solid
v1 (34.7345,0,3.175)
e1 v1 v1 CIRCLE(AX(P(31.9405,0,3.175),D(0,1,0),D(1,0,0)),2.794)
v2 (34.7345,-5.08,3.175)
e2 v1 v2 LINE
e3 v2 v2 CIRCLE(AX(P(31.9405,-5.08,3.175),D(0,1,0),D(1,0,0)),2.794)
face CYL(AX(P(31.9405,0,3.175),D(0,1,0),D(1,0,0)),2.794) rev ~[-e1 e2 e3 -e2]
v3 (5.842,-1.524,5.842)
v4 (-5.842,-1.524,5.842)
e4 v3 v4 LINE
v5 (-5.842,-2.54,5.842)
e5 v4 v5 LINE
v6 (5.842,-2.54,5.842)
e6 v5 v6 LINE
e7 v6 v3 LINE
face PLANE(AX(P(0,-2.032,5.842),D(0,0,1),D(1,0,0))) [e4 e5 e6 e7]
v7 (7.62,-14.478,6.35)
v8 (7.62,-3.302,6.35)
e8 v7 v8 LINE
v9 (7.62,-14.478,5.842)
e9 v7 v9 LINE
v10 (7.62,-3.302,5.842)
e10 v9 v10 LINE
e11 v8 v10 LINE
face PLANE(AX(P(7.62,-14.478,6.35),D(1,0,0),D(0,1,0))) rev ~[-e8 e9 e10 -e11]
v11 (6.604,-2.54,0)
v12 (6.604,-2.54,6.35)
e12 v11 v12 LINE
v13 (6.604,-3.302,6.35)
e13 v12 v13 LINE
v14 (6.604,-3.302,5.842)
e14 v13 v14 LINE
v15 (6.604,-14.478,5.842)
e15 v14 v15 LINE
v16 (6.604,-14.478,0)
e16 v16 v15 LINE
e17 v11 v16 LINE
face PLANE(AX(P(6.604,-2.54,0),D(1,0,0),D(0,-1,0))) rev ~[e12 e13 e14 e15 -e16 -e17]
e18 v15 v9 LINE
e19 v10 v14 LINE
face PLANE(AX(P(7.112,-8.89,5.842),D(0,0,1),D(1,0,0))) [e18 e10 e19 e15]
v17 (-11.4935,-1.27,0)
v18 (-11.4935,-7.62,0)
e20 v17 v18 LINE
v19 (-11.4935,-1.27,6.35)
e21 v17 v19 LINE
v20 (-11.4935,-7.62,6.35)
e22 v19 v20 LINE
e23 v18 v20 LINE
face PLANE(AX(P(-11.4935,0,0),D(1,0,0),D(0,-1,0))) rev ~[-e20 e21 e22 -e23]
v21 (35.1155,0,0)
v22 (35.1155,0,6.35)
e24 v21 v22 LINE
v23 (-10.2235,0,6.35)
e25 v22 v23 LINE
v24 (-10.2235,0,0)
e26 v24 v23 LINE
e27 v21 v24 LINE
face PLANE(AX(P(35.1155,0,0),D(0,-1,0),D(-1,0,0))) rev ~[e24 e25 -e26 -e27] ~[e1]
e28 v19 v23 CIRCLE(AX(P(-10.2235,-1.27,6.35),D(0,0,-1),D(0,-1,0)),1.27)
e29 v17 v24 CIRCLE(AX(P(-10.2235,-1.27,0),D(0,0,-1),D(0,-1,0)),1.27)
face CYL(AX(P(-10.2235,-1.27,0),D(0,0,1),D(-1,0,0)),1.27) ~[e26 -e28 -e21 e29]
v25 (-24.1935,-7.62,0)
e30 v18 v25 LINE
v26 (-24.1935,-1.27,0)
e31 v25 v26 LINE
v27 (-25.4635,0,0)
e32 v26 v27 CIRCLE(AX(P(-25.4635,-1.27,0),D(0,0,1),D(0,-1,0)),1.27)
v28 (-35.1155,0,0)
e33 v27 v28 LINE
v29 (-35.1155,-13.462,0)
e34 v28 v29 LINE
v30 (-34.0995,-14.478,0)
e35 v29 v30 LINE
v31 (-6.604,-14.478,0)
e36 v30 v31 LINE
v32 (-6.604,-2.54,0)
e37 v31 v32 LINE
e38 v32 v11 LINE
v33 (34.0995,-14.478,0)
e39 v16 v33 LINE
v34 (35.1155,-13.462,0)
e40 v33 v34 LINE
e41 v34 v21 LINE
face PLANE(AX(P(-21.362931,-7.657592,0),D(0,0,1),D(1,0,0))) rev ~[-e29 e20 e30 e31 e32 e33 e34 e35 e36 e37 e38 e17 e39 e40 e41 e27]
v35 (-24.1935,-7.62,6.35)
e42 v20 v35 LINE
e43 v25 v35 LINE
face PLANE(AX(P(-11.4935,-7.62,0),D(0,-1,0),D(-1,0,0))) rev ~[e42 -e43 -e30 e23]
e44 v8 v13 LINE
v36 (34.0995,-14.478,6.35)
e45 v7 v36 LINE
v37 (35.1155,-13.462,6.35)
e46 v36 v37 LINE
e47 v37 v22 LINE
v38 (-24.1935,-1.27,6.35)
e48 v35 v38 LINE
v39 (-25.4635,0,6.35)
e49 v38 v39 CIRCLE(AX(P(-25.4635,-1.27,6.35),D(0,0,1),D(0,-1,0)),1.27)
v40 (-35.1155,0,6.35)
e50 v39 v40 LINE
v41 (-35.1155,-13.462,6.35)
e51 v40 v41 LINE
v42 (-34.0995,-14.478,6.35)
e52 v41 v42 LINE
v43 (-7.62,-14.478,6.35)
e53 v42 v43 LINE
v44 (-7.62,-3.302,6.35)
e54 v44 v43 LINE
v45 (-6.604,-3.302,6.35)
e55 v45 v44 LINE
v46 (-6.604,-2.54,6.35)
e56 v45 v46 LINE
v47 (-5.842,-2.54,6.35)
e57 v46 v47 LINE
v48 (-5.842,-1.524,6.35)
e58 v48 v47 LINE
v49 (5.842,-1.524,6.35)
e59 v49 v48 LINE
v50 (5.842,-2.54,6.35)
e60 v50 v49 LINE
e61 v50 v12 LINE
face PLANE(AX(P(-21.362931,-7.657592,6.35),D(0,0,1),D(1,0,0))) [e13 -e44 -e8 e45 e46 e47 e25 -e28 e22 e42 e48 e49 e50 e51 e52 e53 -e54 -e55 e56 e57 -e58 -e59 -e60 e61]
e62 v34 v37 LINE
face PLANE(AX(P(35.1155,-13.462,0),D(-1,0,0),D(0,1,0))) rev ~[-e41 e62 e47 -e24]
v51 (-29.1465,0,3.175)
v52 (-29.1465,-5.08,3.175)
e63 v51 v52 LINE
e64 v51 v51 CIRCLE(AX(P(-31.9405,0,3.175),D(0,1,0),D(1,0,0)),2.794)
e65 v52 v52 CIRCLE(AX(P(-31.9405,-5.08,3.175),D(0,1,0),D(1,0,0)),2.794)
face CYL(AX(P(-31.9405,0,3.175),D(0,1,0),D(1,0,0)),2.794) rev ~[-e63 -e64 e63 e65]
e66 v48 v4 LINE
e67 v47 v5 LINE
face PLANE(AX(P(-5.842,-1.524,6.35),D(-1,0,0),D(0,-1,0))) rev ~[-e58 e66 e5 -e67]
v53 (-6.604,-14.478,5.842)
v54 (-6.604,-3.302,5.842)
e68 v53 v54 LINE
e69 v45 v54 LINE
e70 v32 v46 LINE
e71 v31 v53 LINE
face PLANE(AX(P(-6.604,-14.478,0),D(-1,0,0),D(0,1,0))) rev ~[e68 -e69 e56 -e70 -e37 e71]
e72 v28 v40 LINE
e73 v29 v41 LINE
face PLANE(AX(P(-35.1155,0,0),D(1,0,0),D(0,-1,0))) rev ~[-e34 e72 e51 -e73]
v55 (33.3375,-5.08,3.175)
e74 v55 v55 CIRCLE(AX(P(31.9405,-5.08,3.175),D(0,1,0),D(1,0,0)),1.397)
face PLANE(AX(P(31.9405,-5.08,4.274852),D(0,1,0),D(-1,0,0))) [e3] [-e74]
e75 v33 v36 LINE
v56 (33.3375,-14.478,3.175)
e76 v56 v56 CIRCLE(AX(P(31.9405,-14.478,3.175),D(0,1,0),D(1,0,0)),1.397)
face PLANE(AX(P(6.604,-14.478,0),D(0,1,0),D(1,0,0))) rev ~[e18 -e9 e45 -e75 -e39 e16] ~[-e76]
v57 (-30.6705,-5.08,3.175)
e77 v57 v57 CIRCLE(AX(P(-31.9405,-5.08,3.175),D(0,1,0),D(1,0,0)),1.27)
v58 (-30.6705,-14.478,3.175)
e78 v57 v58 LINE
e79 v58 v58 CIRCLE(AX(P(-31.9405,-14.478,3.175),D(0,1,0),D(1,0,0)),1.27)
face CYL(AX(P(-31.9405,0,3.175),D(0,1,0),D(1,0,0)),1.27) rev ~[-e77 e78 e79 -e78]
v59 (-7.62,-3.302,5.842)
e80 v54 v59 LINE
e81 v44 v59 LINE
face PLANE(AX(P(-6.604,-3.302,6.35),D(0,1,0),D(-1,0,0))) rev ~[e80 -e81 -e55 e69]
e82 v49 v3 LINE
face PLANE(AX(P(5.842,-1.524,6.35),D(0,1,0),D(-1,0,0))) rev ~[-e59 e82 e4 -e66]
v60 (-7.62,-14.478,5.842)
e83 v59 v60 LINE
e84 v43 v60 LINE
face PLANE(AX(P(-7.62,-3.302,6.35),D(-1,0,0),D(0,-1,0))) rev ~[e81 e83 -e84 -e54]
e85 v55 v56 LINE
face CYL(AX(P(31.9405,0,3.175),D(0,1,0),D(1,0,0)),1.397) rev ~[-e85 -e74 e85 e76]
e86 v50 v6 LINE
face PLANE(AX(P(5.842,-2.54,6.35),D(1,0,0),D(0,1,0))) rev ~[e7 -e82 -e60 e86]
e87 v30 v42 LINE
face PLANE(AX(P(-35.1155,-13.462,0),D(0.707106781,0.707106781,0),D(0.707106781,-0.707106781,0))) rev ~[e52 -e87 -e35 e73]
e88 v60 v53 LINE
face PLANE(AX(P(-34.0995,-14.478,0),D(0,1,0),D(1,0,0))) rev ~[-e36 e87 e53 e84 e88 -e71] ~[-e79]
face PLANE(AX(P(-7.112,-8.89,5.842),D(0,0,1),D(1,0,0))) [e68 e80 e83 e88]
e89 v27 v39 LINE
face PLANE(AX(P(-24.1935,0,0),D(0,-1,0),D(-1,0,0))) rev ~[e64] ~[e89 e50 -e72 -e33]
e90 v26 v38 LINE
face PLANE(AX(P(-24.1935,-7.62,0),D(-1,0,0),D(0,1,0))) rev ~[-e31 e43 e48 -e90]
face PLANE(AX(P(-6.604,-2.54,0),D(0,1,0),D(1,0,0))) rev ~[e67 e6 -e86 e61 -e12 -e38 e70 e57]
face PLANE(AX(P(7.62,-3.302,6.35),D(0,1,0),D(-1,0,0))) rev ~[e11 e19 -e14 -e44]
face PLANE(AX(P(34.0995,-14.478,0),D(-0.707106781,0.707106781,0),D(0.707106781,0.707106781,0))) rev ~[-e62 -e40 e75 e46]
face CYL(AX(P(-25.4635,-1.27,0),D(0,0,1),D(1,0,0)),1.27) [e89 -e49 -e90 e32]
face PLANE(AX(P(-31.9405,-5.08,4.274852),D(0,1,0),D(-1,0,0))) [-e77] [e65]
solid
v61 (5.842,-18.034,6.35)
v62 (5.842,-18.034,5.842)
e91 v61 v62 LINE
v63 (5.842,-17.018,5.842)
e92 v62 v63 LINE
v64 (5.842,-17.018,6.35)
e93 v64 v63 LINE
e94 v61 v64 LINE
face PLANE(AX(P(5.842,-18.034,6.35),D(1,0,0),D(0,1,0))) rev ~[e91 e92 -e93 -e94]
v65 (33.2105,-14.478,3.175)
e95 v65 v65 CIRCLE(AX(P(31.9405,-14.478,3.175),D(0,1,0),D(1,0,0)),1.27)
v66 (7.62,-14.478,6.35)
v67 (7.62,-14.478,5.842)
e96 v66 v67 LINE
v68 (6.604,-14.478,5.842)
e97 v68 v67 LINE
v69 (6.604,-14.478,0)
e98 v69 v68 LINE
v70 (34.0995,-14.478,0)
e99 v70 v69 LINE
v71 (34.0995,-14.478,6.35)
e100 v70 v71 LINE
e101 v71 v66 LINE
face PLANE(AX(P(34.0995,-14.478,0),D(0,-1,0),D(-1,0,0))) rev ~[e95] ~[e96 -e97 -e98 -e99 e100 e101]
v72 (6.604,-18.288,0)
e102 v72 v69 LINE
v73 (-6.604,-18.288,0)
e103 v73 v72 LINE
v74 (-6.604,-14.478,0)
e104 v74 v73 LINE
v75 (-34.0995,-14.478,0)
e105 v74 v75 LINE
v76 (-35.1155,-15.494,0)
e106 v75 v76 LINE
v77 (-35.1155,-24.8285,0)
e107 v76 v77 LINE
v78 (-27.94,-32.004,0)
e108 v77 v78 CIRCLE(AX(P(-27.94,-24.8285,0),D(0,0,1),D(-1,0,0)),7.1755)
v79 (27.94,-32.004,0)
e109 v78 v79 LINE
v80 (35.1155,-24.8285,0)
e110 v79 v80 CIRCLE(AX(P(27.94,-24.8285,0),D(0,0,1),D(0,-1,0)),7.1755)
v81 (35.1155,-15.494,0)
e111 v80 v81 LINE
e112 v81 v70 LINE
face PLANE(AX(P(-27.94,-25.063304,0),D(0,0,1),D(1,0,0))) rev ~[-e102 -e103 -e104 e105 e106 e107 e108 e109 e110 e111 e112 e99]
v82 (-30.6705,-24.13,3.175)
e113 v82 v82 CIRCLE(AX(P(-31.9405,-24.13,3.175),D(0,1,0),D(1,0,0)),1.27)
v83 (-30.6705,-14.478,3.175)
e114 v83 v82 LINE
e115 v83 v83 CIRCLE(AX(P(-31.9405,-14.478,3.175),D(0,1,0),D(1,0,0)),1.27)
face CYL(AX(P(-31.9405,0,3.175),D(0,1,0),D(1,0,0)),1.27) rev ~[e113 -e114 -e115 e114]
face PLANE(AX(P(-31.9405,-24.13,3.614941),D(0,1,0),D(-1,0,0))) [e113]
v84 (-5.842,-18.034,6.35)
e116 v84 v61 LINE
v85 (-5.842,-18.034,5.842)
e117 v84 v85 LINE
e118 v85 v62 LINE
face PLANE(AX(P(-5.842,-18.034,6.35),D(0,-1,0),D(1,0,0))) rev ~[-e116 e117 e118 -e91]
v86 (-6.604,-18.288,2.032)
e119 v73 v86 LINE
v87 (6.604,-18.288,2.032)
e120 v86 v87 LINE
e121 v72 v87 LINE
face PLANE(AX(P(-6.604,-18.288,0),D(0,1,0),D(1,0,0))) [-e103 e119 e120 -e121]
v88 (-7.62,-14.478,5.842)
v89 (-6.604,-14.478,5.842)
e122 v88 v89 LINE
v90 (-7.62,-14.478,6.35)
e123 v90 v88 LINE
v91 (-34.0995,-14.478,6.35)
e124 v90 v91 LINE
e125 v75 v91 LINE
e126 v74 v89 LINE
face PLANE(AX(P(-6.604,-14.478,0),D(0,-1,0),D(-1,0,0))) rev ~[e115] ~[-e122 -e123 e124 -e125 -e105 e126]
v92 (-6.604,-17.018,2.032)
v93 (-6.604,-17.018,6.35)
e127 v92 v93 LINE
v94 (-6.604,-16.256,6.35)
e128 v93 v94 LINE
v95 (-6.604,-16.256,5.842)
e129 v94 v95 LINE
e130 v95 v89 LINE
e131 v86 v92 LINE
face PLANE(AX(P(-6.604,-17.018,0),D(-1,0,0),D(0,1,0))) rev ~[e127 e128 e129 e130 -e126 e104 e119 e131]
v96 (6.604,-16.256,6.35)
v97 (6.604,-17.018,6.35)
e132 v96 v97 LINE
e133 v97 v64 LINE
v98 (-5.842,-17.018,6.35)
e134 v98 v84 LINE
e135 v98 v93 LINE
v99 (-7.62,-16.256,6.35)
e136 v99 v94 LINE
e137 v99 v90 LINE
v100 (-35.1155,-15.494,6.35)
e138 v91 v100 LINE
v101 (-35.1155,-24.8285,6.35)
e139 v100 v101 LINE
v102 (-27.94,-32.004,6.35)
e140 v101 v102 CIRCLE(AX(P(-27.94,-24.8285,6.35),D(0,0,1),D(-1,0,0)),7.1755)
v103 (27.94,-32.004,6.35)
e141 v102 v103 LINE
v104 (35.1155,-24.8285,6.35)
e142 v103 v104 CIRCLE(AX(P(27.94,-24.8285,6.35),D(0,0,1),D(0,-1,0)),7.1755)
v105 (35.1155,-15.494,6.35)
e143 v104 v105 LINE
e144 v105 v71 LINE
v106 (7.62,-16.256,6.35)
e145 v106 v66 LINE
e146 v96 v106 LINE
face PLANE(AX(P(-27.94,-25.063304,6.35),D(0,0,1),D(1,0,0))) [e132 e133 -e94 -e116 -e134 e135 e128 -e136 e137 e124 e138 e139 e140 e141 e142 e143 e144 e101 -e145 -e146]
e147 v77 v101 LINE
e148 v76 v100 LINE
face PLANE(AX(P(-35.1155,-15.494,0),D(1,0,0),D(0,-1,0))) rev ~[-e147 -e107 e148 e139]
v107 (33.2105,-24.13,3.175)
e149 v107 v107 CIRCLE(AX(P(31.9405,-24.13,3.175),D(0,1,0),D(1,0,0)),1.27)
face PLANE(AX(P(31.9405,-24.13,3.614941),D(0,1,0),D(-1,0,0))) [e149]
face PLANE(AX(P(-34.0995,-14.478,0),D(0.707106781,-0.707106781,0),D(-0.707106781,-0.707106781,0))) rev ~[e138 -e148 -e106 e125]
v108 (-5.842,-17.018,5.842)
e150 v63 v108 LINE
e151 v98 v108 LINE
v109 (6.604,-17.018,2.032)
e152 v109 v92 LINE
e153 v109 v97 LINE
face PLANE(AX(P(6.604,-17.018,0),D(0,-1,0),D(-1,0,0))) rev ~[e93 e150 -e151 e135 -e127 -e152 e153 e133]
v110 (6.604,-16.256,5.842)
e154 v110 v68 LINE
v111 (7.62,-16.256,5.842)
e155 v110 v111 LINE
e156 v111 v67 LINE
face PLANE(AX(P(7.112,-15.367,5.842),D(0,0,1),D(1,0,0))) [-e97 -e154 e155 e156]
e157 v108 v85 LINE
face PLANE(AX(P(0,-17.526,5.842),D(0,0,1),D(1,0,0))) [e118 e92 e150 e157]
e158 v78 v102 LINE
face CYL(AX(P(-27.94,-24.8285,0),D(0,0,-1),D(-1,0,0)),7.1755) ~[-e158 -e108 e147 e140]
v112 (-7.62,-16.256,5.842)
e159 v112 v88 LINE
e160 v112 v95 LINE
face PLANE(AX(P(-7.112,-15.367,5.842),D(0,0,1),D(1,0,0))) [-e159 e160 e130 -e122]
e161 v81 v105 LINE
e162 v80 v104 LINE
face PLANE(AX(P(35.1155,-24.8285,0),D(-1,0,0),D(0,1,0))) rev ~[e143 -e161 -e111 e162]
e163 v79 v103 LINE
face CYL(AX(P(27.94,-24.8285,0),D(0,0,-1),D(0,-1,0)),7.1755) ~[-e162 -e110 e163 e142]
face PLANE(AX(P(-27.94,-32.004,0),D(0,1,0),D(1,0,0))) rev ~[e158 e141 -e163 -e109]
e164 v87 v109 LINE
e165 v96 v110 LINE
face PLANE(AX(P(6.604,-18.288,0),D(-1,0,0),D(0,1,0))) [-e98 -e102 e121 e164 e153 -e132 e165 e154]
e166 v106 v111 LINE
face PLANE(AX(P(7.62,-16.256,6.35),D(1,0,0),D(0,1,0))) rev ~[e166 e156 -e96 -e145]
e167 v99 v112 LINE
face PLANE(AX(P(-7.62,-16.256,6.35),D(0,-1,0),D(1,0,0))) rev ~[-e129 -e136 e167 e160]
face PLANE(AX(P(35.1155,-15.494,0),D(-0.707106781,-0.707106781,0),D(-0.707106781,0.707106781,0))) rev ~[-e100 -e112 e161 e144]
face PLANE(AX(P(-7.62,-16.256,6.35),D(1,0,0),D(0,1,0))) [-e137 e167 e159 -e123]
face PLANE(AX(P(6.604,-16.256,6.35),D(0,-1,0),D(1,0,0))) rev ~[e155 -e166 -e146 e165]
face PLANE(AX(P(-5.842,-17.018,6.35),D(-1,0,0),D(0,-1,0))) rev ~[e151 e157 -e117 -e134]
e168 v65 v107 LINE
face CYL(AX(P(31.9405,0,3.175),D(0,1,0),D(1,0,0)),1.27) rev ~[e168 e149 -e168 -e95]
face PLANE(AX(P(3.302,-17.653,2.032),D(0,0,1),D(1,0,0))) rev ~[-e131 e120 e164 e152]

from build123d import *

# Parameters (mm, degrees)
F0_W      = 6.604
F0_H      = 2.54
F1_DEPTH  = 6.35
F0_H_2    = 1.27
F0_W_2    = 2.54
F2_DEPTH  = 6.35
F3_DEPTH  = 2.032
F6_DEPTH  = 5.08
F7_DEPTH  = 24.13
F8_DEPTH  = 14.478
F11_W     = 1.016
F11_H     = 1.778
F12_DEPTH = 0.508
F13_DEPTH = 0.508
F14_R     = 1.27


# Not quite as in the source:
# - a feature names something its author has since deleted; it is built from what else it names


with BuildPart() as f1:
    # F0 (on Top) → F1 (new body)
    with BuildSketch(Plane.XY):
        Polygon((-9.144, -14.478), (-9.144, 0), (-11.4935, 0), (-11.4935, -7.62), (-24.1935, -7.62), (-24.1935, 0), (-35.1155, 0), (-35.1155, -13.462), (-34.0995, -14.478), align=None)
        Polygon((35.1155, 0), (9.144, 0), (9.144, -14.478), (34.0995, -14.478), (35.1155, -13.462), align=None)
        Polygon((-6.604, -2.54), (-6.604, 0), (-9.144, 0), (-9.144, -14.478), (-6.604, -14.478), align=None)
        with Locations((-3.302, -1.27)):
            Rectangle(F0_W, F0_H)
        Polygon((9.144, 0), (0, 0), (0, -2.54), (6.604, -2.54), (6.604, -14.478), (9.144, -14.478), align=None)
    extrude(amount=F1_DEPTH)

    # F5 (on face) + F4 (on face) → F6 (cut)
    with BuildSketch(Plane(origin=(0, 0, 0), x_dir=(-1, 0, 0), z_dir=(0, 1, 0))):
        with BuildLine():
            ThreePointArc((-29.1465, 3.175), (-31.9405, 5.969), (-34.7345, 3.175))
            Line((-34.7345, 3.175), (-33.3375, 3.175))
            ThreePointArc((-33.3375, 3.175), (-31.9405, 4.572), (-30.5435, 3.175))
            Line((-30.5435, 3.175), (-29.1465, 3.175))
        make_face()
        with BuildLine():
            Line((-33.3375, 3.175), (-34.7345, 3.175))
            ThreePointArc((-34.7345, 3.175), (-31.9405, 0.381), (-29.1465, 3.175))
            Line((-29.1465, 3.175), (-30.5435, 3.175))
            ThreePointArc((-30.5435, 3.175), (-31.9405, 1.778), (-33.3375, 3.175))
        make_face()
        with BuildLine():
            Line((-33.2105, 3.175), (-33.3375, 3.175))
            ThreePointArc((-33.3375, 3.175), (-31.9405, 1.778), (-30.5435, 3.175))
            Line((-30.5435, 3.175), (-30.6705, 3.175))
            ThreePointArc((-30.6705, 3.175), (-31.9405, 1.905), (-33.2105, 3.175))
        make_face()
        with BuildLine():
            Line((-30.6705, 3.175), (-33.2105, 3.175))
            ThreePointArc((-33.2105, 3.175), (-31.9405, 1.905), (-30.6705, 3.175))
        make_face()
        with BuildLine():
            ThreePointArc((-30.5435, 3.175), (-31.9405, 4.572), (-33.3375, 3.175))
            Line((-33.3375, 3.175), (-33.2105, 3.175))
            ThreePointArc((-33.2105, 3.175), (-31.9405, 4.445), (-30.6705, 3.175))
            Line((-30.6705, 3.175), (-30.5435, 3.175))
        make_face()
        with BuildLine():
            ThreePointArc((-30.6705, 3.175), (-31.9405, 4.445), (-33.2105, 3.175))
            Line((-33.2105, 3.175), (-30.6705, 3.175))
        make_face()
    with BuildSketch(Plane(origin=(0, 0, 0), x_dir=(-1, 0, 0), z_dir=(0, 1, 0))):
        with BuildLine():
            Line((33.3375, 3.175), (34.7345, 3.175))
            ThreePointArc((34.7345, 3.175), (31.9405, 5.969), (29.1465, 3.175))
            Line((29.1465, 3.175), (30.5435, 3.175))
            ThreePointArc((30.5435, 3.175), (31.9405, 4.572), (33.3375, 3.175))
        make_face()
        with BuildLine():
            ThreePointArc((29.1465, 3.175), (31.9405, 0.381), (34.7345, 3.175))
            Line((34.7345, 3.175), (33.3375, 3.175))
            ThreePointArc((33.3375, 3.175), (31.9405, 1.778), (30.5435, 3.175))
            Line((30.5435, 3.175), (29.1465, 3.175))
        make_face()
        with BuildLine():
            ThreePointArc((30.5435, 3.175), (31.9405, 1.778), (33.3375, 3.175))
            Line((33.3375, 3.175), (33.2105, 3.175))
            ThreePointArc((33.2105, 3.175), (31.9405, 1.905), (30.6705, 3.175))
            Line((30.6705, 3.175), (30.5435, 3.175))
        make_face()
        with BuildLine():
            Line((33.2105, 3.175), (33.3375, 3.175))
            ThreePointArc((33.3375, 3.175), (31.9405, 4.572), (30.5435, 3.175))
            Line((30.5435, 3.175), (30.6705, 3.175))
            ThreePointArc((30.6705, 3.175), (31.9405, 4.445), (33.2105, 3.175))
        make_face()
        with BuildLine():
            Line((30.6705, 3.175), (33.2105, 3.175))
            ThreePointArc((33.2105, 3.175), (31.9405, 4.445), (30.6705, 3.175))
        make_face()
        with BuildLine():
            ThreePointArc((30.6705, 3.175), (31.9405, 1.905), (33.2105, 3.175))
            Line((33.2105, 3.175), (30.6705, 3.175))
        make_face()
    extrude(amount=-F6_DEPTH, mode=Mode.SUBTRACT)


with BuildPart() as f2:
    # F0 (on Top) → F2 (new body)
    with BuildSketch(Plane.XY):
        with BuildLine():
            ThreePointArc((-20.7645, -24.8285), (-27.94, -17.653), (-35.1155, -24.8285))
            ThreePointArc((-35.1155, -24.8285), (-33.0138447084, -29.9023447084), (-27.94, -32.004))
            ThreePointArc((-27.94, -32.004), (-22.8661552916, -29.9023447084), (-20.7645, -24.8285))
        make_face()
        with BuildLine():
            ThreePointArc((27.94, -32.004), (33.0138447084, -29.9023447084), (35.1155, -24.8285))
            ThreePointArc((35.1155, -24.8285), (22.8661552916, -19.7546552916), (27.94, -32.004))
        make_face()
        with Locations((-3.302, -17.653)):
            Rectangle(F0_W, F0_H_2)
        with BuildLine():
            Line((-9.144, -19.558), (-9.144, -14.478))
            Line((-9.144, -14.478), (-34.0995, -14.478))
            Line((-34.0995, -14.478), (-35.1155, -15.494))
            Line((-35.1155, -15.494), (-35.1155, -24.8285))
            ThreePointArc((-35.1155, -24.8285), (-27.94, -17.653), (-20.7645, -24.8285))
            ThreePointArc((-20.7645, -24.8285), (-22.8661552916, -29.9023447084), (-27.94, -32.004))
            Line((-27.94, -32.004), (0, -32.004))
            Line((0, -32.004), (0, -19.558))
            Line((0, -19.558), (-9.144, -19.558))
        make_face()
        Polygon((9.144, -19.558), (9.144, -17.018), (6.604, -17.018), (6.604, -18.288), (6.604, -19.558), align=None)
        with Locations((7.874, -15.748)):
            Rectangle(F0_W_2, F0_H)
        with Locations((3.302, -18.923)):
            Rectangle(F0_W, F0_H_2)
        with BuildLine():
            Line((34.0995, -14.478), (9.144, -14.478))
            Line((9.144, -14.478), (9.144, -17.018))
            Line((9.144, -17.018), (9.144, -19.558))
            Line((9.144, -19.558), (6.604, -19.558))
            Line((6.604, -19.558), (0, -19.558))
            Line((0, -19.558), (0, -32.004))
            Line((0, -32.004), (27.94, -32.004))
            ThreePointArc((27.94, -32.004), (22.8661552916, -19.7546552916), (35.1155, -24.8285))
            Line((35.1155, -24.8285), (35.1155, -15.494))
            Line((35.1155, -15.494), (34.0995, -14.478))
        make_face()
        Polygon((-6.604, -14.478), (-9.144, -14.478), (-9.144, -19.558), (0, -19.558), (0, -18.288), (-6.604, -18.288), (-6.604, -17.018), align=None)
        with Locations((3.302, -17.653)):
            Rectangle(F0_W, F0_H_2)
    extrude(amount=F2_DEPTH)

    # F0 (on Top) → F3 (cut)
    with BuildSketch(Plane.XY):
        with Locations((3.302, -17.653)):
            Rectangle(F0_W, F0_H_2)
        with Locations((-3.302, -17.653)):
            Rectangle(F0_W, F0_H_2)
    extrude(amount=F3_DEPTH, mode=Mode.SUBTRACT)


with BuildPart() as f7_tool:
    # F5 (on face) + F4 (on face) → F7 (new body)
    with BuildSketch(Plane(origin=(0, 0, 0), x_dir=(-1, 0, 0), z_dir=(0, 1, 0))):
        with BuildLine():
            ThreePointArc((-30.6705, 3.175), (-31.9405, 4.445), (-33.2105, 3.175))
            Line((-33.2105, 3.175), (-30.6705, 3.175))
        make_face()
        with BuildLine():
            Line((-30.6705, 3.175), (-33.2105, 3.175))
            ThreePointArc((-33.2105, 3.175), (-31.9405, 1.905), (-30.6705, 3.175))
        make_face()
    with BuildSketch(Plane(origin=(0, 0, 0), x_dir=(-1, 0, 0), z_dir=(0, 1, 0))):
        with BuildLine():
            Line((30.6705, 3.175), (33.2105, 3.175))
            ThreePointArc((33.2105, 3.175), (31.9405, 4.445), (30.6705, 3.175))
        make_face()
        with BuildLine():
            ThreePointArc((30.6705, 3.175), (31.9405, 1.905), (33.2105, 3.175))
            Line((33.2105, 3.175), (30.6705, 3.175))
        make_face()
    extrude(amount=-F7_DEPTH)


with BuildPart() as f1_1:
    add(f1.part)

    # F7: cut by f7_tool
    add(f7_tool.part, mode=Mode.SUBTRACT)

    # F5 (on face) + F4 (on face) → F8 (cut, through all)
    with BuildSketch(Plane(origin=(0, 0, 0), x_dir=(-1, 0, 0), z_dir=(0, 1, 0))):
        with BuildLine():
            ThreePointArc((-30.5435, 3.175), (-31.9405, 4.572), (-33.3375, 3.175))
            Line((-33.3375, 3.175), (-33.2105, 3.175))
            ThreePointArc((-33.2105, 3.175), (-31.9405, 4.445), (-30.6705, 3.175))
            Line((-30.6705, 3.175), (-30.5435, 3.175))
        make_face()
        with BuildLine():
            Line((-33.2105, 3.175), (-33.3375, 3.175))
            ThreePointArc((-33.3375, 3.175), (-31.9405, 1.778), (-30.5435, 3.175))
            Line((-30.5435, 3.175), (-30.6705, 3.175))
            ThreePointArc((-30.6705, 3.175), (-31.9405, 1.905), (-33.2105, 3.175))
        make_face()
    with BuildSketch(Plane(origin=(0, 0, 0), x_dir=(-1, 0, 0), z_dir=(0, 1, 0))):
        with BuildLine():
            Line((30.6705, 3.175), (33.2105, 3.175))
            ThreePointArc((33.2105, 3.175), (31.9405, 4.445), (30.6705, 3.175))
        make_face()
        with BuildLine():
            ThreePointArc((30.6705, 3.175), (31.9405, 1.905), (33.2105, 3.175))
            Line((33.2105, 3.175), (30.6705, 3.175))
        make_face()
    extrude(amount=-F8_DEPTH, mode=Mode.SUBTRACT)


with BuildPart() as f2_1:
    add(f2.part)

    # F7: cut by f7_tool
    add(f7_tool.part, mode=Mode.SUBTRACT)


with BuildPart() as f12_tool:
    # F9 (on face) + F10 (on face) + F11 (on face) → F12 (new body)
    with BuildSketch(Plane.XY.offset(6.35)):
        Polygon((-5.842, -2.54), (0, -2.54), (5.842, -2.54), (5.842, -1.524), (-5.842, -1.524), align=None)
    with BuildSketch(Plane.XY.offset(6.35)):
        Polygon((5.842, -18.034), (5.842, -17.018), (0, -17.018), (-5.842, -17.018), (-5.842, -18.034), align=None)
    with BuildSketch(Plane.XY.offset(6.35)):
        with Locations((-7.112, -15.367)):
            Rectangle(F11_W, F11_H)
        with Locations((7.112, -15.367)):
            Rectangle(F11_W, F11_H)
    extrude(amount=-F12_DEPTH)


with BuildPart() as f1_2:
    add(f1_1.part)

    # F12: cut by f12_tool
    add(f12_tool.part, mode=Mode.SUBTRACT)

    # F11 (on face) → F13 (cut)
    with BuildSketch(Plane.XY.offset(6.35)):
        Polygon((-6.604, -14.478), (-6.604, -9.779), (-6.604, -3.302), (-7.62, -3.302), (-7.62, -14.478), align=None)
        Polygon((6.604, -3.302), (6.604, -9.779), (6.604, -14.478), (7.62, -14.478), (7.62, -3.302), align=None)
    extrude(amount=-F13_DEPTH, mode=Mode.SUBTRACT)

    # F14
    f14_edges = [f1_2.edges().sort_by_distance(p)[0] for p in [
        (-11.4935, 0, 3.175),
        (-24.1935, 0, 3.175),
    ]]
    fillet(f14_edges, radius=F14_R)


with BuildPart() as f2_2:
    add(f2_1.part)

    # F12: cut by f12_tool
    add(f12_tool.part, mode=Mode.SUBTRACT)


solid = Compound([f1_2.part, f2_2.part])
